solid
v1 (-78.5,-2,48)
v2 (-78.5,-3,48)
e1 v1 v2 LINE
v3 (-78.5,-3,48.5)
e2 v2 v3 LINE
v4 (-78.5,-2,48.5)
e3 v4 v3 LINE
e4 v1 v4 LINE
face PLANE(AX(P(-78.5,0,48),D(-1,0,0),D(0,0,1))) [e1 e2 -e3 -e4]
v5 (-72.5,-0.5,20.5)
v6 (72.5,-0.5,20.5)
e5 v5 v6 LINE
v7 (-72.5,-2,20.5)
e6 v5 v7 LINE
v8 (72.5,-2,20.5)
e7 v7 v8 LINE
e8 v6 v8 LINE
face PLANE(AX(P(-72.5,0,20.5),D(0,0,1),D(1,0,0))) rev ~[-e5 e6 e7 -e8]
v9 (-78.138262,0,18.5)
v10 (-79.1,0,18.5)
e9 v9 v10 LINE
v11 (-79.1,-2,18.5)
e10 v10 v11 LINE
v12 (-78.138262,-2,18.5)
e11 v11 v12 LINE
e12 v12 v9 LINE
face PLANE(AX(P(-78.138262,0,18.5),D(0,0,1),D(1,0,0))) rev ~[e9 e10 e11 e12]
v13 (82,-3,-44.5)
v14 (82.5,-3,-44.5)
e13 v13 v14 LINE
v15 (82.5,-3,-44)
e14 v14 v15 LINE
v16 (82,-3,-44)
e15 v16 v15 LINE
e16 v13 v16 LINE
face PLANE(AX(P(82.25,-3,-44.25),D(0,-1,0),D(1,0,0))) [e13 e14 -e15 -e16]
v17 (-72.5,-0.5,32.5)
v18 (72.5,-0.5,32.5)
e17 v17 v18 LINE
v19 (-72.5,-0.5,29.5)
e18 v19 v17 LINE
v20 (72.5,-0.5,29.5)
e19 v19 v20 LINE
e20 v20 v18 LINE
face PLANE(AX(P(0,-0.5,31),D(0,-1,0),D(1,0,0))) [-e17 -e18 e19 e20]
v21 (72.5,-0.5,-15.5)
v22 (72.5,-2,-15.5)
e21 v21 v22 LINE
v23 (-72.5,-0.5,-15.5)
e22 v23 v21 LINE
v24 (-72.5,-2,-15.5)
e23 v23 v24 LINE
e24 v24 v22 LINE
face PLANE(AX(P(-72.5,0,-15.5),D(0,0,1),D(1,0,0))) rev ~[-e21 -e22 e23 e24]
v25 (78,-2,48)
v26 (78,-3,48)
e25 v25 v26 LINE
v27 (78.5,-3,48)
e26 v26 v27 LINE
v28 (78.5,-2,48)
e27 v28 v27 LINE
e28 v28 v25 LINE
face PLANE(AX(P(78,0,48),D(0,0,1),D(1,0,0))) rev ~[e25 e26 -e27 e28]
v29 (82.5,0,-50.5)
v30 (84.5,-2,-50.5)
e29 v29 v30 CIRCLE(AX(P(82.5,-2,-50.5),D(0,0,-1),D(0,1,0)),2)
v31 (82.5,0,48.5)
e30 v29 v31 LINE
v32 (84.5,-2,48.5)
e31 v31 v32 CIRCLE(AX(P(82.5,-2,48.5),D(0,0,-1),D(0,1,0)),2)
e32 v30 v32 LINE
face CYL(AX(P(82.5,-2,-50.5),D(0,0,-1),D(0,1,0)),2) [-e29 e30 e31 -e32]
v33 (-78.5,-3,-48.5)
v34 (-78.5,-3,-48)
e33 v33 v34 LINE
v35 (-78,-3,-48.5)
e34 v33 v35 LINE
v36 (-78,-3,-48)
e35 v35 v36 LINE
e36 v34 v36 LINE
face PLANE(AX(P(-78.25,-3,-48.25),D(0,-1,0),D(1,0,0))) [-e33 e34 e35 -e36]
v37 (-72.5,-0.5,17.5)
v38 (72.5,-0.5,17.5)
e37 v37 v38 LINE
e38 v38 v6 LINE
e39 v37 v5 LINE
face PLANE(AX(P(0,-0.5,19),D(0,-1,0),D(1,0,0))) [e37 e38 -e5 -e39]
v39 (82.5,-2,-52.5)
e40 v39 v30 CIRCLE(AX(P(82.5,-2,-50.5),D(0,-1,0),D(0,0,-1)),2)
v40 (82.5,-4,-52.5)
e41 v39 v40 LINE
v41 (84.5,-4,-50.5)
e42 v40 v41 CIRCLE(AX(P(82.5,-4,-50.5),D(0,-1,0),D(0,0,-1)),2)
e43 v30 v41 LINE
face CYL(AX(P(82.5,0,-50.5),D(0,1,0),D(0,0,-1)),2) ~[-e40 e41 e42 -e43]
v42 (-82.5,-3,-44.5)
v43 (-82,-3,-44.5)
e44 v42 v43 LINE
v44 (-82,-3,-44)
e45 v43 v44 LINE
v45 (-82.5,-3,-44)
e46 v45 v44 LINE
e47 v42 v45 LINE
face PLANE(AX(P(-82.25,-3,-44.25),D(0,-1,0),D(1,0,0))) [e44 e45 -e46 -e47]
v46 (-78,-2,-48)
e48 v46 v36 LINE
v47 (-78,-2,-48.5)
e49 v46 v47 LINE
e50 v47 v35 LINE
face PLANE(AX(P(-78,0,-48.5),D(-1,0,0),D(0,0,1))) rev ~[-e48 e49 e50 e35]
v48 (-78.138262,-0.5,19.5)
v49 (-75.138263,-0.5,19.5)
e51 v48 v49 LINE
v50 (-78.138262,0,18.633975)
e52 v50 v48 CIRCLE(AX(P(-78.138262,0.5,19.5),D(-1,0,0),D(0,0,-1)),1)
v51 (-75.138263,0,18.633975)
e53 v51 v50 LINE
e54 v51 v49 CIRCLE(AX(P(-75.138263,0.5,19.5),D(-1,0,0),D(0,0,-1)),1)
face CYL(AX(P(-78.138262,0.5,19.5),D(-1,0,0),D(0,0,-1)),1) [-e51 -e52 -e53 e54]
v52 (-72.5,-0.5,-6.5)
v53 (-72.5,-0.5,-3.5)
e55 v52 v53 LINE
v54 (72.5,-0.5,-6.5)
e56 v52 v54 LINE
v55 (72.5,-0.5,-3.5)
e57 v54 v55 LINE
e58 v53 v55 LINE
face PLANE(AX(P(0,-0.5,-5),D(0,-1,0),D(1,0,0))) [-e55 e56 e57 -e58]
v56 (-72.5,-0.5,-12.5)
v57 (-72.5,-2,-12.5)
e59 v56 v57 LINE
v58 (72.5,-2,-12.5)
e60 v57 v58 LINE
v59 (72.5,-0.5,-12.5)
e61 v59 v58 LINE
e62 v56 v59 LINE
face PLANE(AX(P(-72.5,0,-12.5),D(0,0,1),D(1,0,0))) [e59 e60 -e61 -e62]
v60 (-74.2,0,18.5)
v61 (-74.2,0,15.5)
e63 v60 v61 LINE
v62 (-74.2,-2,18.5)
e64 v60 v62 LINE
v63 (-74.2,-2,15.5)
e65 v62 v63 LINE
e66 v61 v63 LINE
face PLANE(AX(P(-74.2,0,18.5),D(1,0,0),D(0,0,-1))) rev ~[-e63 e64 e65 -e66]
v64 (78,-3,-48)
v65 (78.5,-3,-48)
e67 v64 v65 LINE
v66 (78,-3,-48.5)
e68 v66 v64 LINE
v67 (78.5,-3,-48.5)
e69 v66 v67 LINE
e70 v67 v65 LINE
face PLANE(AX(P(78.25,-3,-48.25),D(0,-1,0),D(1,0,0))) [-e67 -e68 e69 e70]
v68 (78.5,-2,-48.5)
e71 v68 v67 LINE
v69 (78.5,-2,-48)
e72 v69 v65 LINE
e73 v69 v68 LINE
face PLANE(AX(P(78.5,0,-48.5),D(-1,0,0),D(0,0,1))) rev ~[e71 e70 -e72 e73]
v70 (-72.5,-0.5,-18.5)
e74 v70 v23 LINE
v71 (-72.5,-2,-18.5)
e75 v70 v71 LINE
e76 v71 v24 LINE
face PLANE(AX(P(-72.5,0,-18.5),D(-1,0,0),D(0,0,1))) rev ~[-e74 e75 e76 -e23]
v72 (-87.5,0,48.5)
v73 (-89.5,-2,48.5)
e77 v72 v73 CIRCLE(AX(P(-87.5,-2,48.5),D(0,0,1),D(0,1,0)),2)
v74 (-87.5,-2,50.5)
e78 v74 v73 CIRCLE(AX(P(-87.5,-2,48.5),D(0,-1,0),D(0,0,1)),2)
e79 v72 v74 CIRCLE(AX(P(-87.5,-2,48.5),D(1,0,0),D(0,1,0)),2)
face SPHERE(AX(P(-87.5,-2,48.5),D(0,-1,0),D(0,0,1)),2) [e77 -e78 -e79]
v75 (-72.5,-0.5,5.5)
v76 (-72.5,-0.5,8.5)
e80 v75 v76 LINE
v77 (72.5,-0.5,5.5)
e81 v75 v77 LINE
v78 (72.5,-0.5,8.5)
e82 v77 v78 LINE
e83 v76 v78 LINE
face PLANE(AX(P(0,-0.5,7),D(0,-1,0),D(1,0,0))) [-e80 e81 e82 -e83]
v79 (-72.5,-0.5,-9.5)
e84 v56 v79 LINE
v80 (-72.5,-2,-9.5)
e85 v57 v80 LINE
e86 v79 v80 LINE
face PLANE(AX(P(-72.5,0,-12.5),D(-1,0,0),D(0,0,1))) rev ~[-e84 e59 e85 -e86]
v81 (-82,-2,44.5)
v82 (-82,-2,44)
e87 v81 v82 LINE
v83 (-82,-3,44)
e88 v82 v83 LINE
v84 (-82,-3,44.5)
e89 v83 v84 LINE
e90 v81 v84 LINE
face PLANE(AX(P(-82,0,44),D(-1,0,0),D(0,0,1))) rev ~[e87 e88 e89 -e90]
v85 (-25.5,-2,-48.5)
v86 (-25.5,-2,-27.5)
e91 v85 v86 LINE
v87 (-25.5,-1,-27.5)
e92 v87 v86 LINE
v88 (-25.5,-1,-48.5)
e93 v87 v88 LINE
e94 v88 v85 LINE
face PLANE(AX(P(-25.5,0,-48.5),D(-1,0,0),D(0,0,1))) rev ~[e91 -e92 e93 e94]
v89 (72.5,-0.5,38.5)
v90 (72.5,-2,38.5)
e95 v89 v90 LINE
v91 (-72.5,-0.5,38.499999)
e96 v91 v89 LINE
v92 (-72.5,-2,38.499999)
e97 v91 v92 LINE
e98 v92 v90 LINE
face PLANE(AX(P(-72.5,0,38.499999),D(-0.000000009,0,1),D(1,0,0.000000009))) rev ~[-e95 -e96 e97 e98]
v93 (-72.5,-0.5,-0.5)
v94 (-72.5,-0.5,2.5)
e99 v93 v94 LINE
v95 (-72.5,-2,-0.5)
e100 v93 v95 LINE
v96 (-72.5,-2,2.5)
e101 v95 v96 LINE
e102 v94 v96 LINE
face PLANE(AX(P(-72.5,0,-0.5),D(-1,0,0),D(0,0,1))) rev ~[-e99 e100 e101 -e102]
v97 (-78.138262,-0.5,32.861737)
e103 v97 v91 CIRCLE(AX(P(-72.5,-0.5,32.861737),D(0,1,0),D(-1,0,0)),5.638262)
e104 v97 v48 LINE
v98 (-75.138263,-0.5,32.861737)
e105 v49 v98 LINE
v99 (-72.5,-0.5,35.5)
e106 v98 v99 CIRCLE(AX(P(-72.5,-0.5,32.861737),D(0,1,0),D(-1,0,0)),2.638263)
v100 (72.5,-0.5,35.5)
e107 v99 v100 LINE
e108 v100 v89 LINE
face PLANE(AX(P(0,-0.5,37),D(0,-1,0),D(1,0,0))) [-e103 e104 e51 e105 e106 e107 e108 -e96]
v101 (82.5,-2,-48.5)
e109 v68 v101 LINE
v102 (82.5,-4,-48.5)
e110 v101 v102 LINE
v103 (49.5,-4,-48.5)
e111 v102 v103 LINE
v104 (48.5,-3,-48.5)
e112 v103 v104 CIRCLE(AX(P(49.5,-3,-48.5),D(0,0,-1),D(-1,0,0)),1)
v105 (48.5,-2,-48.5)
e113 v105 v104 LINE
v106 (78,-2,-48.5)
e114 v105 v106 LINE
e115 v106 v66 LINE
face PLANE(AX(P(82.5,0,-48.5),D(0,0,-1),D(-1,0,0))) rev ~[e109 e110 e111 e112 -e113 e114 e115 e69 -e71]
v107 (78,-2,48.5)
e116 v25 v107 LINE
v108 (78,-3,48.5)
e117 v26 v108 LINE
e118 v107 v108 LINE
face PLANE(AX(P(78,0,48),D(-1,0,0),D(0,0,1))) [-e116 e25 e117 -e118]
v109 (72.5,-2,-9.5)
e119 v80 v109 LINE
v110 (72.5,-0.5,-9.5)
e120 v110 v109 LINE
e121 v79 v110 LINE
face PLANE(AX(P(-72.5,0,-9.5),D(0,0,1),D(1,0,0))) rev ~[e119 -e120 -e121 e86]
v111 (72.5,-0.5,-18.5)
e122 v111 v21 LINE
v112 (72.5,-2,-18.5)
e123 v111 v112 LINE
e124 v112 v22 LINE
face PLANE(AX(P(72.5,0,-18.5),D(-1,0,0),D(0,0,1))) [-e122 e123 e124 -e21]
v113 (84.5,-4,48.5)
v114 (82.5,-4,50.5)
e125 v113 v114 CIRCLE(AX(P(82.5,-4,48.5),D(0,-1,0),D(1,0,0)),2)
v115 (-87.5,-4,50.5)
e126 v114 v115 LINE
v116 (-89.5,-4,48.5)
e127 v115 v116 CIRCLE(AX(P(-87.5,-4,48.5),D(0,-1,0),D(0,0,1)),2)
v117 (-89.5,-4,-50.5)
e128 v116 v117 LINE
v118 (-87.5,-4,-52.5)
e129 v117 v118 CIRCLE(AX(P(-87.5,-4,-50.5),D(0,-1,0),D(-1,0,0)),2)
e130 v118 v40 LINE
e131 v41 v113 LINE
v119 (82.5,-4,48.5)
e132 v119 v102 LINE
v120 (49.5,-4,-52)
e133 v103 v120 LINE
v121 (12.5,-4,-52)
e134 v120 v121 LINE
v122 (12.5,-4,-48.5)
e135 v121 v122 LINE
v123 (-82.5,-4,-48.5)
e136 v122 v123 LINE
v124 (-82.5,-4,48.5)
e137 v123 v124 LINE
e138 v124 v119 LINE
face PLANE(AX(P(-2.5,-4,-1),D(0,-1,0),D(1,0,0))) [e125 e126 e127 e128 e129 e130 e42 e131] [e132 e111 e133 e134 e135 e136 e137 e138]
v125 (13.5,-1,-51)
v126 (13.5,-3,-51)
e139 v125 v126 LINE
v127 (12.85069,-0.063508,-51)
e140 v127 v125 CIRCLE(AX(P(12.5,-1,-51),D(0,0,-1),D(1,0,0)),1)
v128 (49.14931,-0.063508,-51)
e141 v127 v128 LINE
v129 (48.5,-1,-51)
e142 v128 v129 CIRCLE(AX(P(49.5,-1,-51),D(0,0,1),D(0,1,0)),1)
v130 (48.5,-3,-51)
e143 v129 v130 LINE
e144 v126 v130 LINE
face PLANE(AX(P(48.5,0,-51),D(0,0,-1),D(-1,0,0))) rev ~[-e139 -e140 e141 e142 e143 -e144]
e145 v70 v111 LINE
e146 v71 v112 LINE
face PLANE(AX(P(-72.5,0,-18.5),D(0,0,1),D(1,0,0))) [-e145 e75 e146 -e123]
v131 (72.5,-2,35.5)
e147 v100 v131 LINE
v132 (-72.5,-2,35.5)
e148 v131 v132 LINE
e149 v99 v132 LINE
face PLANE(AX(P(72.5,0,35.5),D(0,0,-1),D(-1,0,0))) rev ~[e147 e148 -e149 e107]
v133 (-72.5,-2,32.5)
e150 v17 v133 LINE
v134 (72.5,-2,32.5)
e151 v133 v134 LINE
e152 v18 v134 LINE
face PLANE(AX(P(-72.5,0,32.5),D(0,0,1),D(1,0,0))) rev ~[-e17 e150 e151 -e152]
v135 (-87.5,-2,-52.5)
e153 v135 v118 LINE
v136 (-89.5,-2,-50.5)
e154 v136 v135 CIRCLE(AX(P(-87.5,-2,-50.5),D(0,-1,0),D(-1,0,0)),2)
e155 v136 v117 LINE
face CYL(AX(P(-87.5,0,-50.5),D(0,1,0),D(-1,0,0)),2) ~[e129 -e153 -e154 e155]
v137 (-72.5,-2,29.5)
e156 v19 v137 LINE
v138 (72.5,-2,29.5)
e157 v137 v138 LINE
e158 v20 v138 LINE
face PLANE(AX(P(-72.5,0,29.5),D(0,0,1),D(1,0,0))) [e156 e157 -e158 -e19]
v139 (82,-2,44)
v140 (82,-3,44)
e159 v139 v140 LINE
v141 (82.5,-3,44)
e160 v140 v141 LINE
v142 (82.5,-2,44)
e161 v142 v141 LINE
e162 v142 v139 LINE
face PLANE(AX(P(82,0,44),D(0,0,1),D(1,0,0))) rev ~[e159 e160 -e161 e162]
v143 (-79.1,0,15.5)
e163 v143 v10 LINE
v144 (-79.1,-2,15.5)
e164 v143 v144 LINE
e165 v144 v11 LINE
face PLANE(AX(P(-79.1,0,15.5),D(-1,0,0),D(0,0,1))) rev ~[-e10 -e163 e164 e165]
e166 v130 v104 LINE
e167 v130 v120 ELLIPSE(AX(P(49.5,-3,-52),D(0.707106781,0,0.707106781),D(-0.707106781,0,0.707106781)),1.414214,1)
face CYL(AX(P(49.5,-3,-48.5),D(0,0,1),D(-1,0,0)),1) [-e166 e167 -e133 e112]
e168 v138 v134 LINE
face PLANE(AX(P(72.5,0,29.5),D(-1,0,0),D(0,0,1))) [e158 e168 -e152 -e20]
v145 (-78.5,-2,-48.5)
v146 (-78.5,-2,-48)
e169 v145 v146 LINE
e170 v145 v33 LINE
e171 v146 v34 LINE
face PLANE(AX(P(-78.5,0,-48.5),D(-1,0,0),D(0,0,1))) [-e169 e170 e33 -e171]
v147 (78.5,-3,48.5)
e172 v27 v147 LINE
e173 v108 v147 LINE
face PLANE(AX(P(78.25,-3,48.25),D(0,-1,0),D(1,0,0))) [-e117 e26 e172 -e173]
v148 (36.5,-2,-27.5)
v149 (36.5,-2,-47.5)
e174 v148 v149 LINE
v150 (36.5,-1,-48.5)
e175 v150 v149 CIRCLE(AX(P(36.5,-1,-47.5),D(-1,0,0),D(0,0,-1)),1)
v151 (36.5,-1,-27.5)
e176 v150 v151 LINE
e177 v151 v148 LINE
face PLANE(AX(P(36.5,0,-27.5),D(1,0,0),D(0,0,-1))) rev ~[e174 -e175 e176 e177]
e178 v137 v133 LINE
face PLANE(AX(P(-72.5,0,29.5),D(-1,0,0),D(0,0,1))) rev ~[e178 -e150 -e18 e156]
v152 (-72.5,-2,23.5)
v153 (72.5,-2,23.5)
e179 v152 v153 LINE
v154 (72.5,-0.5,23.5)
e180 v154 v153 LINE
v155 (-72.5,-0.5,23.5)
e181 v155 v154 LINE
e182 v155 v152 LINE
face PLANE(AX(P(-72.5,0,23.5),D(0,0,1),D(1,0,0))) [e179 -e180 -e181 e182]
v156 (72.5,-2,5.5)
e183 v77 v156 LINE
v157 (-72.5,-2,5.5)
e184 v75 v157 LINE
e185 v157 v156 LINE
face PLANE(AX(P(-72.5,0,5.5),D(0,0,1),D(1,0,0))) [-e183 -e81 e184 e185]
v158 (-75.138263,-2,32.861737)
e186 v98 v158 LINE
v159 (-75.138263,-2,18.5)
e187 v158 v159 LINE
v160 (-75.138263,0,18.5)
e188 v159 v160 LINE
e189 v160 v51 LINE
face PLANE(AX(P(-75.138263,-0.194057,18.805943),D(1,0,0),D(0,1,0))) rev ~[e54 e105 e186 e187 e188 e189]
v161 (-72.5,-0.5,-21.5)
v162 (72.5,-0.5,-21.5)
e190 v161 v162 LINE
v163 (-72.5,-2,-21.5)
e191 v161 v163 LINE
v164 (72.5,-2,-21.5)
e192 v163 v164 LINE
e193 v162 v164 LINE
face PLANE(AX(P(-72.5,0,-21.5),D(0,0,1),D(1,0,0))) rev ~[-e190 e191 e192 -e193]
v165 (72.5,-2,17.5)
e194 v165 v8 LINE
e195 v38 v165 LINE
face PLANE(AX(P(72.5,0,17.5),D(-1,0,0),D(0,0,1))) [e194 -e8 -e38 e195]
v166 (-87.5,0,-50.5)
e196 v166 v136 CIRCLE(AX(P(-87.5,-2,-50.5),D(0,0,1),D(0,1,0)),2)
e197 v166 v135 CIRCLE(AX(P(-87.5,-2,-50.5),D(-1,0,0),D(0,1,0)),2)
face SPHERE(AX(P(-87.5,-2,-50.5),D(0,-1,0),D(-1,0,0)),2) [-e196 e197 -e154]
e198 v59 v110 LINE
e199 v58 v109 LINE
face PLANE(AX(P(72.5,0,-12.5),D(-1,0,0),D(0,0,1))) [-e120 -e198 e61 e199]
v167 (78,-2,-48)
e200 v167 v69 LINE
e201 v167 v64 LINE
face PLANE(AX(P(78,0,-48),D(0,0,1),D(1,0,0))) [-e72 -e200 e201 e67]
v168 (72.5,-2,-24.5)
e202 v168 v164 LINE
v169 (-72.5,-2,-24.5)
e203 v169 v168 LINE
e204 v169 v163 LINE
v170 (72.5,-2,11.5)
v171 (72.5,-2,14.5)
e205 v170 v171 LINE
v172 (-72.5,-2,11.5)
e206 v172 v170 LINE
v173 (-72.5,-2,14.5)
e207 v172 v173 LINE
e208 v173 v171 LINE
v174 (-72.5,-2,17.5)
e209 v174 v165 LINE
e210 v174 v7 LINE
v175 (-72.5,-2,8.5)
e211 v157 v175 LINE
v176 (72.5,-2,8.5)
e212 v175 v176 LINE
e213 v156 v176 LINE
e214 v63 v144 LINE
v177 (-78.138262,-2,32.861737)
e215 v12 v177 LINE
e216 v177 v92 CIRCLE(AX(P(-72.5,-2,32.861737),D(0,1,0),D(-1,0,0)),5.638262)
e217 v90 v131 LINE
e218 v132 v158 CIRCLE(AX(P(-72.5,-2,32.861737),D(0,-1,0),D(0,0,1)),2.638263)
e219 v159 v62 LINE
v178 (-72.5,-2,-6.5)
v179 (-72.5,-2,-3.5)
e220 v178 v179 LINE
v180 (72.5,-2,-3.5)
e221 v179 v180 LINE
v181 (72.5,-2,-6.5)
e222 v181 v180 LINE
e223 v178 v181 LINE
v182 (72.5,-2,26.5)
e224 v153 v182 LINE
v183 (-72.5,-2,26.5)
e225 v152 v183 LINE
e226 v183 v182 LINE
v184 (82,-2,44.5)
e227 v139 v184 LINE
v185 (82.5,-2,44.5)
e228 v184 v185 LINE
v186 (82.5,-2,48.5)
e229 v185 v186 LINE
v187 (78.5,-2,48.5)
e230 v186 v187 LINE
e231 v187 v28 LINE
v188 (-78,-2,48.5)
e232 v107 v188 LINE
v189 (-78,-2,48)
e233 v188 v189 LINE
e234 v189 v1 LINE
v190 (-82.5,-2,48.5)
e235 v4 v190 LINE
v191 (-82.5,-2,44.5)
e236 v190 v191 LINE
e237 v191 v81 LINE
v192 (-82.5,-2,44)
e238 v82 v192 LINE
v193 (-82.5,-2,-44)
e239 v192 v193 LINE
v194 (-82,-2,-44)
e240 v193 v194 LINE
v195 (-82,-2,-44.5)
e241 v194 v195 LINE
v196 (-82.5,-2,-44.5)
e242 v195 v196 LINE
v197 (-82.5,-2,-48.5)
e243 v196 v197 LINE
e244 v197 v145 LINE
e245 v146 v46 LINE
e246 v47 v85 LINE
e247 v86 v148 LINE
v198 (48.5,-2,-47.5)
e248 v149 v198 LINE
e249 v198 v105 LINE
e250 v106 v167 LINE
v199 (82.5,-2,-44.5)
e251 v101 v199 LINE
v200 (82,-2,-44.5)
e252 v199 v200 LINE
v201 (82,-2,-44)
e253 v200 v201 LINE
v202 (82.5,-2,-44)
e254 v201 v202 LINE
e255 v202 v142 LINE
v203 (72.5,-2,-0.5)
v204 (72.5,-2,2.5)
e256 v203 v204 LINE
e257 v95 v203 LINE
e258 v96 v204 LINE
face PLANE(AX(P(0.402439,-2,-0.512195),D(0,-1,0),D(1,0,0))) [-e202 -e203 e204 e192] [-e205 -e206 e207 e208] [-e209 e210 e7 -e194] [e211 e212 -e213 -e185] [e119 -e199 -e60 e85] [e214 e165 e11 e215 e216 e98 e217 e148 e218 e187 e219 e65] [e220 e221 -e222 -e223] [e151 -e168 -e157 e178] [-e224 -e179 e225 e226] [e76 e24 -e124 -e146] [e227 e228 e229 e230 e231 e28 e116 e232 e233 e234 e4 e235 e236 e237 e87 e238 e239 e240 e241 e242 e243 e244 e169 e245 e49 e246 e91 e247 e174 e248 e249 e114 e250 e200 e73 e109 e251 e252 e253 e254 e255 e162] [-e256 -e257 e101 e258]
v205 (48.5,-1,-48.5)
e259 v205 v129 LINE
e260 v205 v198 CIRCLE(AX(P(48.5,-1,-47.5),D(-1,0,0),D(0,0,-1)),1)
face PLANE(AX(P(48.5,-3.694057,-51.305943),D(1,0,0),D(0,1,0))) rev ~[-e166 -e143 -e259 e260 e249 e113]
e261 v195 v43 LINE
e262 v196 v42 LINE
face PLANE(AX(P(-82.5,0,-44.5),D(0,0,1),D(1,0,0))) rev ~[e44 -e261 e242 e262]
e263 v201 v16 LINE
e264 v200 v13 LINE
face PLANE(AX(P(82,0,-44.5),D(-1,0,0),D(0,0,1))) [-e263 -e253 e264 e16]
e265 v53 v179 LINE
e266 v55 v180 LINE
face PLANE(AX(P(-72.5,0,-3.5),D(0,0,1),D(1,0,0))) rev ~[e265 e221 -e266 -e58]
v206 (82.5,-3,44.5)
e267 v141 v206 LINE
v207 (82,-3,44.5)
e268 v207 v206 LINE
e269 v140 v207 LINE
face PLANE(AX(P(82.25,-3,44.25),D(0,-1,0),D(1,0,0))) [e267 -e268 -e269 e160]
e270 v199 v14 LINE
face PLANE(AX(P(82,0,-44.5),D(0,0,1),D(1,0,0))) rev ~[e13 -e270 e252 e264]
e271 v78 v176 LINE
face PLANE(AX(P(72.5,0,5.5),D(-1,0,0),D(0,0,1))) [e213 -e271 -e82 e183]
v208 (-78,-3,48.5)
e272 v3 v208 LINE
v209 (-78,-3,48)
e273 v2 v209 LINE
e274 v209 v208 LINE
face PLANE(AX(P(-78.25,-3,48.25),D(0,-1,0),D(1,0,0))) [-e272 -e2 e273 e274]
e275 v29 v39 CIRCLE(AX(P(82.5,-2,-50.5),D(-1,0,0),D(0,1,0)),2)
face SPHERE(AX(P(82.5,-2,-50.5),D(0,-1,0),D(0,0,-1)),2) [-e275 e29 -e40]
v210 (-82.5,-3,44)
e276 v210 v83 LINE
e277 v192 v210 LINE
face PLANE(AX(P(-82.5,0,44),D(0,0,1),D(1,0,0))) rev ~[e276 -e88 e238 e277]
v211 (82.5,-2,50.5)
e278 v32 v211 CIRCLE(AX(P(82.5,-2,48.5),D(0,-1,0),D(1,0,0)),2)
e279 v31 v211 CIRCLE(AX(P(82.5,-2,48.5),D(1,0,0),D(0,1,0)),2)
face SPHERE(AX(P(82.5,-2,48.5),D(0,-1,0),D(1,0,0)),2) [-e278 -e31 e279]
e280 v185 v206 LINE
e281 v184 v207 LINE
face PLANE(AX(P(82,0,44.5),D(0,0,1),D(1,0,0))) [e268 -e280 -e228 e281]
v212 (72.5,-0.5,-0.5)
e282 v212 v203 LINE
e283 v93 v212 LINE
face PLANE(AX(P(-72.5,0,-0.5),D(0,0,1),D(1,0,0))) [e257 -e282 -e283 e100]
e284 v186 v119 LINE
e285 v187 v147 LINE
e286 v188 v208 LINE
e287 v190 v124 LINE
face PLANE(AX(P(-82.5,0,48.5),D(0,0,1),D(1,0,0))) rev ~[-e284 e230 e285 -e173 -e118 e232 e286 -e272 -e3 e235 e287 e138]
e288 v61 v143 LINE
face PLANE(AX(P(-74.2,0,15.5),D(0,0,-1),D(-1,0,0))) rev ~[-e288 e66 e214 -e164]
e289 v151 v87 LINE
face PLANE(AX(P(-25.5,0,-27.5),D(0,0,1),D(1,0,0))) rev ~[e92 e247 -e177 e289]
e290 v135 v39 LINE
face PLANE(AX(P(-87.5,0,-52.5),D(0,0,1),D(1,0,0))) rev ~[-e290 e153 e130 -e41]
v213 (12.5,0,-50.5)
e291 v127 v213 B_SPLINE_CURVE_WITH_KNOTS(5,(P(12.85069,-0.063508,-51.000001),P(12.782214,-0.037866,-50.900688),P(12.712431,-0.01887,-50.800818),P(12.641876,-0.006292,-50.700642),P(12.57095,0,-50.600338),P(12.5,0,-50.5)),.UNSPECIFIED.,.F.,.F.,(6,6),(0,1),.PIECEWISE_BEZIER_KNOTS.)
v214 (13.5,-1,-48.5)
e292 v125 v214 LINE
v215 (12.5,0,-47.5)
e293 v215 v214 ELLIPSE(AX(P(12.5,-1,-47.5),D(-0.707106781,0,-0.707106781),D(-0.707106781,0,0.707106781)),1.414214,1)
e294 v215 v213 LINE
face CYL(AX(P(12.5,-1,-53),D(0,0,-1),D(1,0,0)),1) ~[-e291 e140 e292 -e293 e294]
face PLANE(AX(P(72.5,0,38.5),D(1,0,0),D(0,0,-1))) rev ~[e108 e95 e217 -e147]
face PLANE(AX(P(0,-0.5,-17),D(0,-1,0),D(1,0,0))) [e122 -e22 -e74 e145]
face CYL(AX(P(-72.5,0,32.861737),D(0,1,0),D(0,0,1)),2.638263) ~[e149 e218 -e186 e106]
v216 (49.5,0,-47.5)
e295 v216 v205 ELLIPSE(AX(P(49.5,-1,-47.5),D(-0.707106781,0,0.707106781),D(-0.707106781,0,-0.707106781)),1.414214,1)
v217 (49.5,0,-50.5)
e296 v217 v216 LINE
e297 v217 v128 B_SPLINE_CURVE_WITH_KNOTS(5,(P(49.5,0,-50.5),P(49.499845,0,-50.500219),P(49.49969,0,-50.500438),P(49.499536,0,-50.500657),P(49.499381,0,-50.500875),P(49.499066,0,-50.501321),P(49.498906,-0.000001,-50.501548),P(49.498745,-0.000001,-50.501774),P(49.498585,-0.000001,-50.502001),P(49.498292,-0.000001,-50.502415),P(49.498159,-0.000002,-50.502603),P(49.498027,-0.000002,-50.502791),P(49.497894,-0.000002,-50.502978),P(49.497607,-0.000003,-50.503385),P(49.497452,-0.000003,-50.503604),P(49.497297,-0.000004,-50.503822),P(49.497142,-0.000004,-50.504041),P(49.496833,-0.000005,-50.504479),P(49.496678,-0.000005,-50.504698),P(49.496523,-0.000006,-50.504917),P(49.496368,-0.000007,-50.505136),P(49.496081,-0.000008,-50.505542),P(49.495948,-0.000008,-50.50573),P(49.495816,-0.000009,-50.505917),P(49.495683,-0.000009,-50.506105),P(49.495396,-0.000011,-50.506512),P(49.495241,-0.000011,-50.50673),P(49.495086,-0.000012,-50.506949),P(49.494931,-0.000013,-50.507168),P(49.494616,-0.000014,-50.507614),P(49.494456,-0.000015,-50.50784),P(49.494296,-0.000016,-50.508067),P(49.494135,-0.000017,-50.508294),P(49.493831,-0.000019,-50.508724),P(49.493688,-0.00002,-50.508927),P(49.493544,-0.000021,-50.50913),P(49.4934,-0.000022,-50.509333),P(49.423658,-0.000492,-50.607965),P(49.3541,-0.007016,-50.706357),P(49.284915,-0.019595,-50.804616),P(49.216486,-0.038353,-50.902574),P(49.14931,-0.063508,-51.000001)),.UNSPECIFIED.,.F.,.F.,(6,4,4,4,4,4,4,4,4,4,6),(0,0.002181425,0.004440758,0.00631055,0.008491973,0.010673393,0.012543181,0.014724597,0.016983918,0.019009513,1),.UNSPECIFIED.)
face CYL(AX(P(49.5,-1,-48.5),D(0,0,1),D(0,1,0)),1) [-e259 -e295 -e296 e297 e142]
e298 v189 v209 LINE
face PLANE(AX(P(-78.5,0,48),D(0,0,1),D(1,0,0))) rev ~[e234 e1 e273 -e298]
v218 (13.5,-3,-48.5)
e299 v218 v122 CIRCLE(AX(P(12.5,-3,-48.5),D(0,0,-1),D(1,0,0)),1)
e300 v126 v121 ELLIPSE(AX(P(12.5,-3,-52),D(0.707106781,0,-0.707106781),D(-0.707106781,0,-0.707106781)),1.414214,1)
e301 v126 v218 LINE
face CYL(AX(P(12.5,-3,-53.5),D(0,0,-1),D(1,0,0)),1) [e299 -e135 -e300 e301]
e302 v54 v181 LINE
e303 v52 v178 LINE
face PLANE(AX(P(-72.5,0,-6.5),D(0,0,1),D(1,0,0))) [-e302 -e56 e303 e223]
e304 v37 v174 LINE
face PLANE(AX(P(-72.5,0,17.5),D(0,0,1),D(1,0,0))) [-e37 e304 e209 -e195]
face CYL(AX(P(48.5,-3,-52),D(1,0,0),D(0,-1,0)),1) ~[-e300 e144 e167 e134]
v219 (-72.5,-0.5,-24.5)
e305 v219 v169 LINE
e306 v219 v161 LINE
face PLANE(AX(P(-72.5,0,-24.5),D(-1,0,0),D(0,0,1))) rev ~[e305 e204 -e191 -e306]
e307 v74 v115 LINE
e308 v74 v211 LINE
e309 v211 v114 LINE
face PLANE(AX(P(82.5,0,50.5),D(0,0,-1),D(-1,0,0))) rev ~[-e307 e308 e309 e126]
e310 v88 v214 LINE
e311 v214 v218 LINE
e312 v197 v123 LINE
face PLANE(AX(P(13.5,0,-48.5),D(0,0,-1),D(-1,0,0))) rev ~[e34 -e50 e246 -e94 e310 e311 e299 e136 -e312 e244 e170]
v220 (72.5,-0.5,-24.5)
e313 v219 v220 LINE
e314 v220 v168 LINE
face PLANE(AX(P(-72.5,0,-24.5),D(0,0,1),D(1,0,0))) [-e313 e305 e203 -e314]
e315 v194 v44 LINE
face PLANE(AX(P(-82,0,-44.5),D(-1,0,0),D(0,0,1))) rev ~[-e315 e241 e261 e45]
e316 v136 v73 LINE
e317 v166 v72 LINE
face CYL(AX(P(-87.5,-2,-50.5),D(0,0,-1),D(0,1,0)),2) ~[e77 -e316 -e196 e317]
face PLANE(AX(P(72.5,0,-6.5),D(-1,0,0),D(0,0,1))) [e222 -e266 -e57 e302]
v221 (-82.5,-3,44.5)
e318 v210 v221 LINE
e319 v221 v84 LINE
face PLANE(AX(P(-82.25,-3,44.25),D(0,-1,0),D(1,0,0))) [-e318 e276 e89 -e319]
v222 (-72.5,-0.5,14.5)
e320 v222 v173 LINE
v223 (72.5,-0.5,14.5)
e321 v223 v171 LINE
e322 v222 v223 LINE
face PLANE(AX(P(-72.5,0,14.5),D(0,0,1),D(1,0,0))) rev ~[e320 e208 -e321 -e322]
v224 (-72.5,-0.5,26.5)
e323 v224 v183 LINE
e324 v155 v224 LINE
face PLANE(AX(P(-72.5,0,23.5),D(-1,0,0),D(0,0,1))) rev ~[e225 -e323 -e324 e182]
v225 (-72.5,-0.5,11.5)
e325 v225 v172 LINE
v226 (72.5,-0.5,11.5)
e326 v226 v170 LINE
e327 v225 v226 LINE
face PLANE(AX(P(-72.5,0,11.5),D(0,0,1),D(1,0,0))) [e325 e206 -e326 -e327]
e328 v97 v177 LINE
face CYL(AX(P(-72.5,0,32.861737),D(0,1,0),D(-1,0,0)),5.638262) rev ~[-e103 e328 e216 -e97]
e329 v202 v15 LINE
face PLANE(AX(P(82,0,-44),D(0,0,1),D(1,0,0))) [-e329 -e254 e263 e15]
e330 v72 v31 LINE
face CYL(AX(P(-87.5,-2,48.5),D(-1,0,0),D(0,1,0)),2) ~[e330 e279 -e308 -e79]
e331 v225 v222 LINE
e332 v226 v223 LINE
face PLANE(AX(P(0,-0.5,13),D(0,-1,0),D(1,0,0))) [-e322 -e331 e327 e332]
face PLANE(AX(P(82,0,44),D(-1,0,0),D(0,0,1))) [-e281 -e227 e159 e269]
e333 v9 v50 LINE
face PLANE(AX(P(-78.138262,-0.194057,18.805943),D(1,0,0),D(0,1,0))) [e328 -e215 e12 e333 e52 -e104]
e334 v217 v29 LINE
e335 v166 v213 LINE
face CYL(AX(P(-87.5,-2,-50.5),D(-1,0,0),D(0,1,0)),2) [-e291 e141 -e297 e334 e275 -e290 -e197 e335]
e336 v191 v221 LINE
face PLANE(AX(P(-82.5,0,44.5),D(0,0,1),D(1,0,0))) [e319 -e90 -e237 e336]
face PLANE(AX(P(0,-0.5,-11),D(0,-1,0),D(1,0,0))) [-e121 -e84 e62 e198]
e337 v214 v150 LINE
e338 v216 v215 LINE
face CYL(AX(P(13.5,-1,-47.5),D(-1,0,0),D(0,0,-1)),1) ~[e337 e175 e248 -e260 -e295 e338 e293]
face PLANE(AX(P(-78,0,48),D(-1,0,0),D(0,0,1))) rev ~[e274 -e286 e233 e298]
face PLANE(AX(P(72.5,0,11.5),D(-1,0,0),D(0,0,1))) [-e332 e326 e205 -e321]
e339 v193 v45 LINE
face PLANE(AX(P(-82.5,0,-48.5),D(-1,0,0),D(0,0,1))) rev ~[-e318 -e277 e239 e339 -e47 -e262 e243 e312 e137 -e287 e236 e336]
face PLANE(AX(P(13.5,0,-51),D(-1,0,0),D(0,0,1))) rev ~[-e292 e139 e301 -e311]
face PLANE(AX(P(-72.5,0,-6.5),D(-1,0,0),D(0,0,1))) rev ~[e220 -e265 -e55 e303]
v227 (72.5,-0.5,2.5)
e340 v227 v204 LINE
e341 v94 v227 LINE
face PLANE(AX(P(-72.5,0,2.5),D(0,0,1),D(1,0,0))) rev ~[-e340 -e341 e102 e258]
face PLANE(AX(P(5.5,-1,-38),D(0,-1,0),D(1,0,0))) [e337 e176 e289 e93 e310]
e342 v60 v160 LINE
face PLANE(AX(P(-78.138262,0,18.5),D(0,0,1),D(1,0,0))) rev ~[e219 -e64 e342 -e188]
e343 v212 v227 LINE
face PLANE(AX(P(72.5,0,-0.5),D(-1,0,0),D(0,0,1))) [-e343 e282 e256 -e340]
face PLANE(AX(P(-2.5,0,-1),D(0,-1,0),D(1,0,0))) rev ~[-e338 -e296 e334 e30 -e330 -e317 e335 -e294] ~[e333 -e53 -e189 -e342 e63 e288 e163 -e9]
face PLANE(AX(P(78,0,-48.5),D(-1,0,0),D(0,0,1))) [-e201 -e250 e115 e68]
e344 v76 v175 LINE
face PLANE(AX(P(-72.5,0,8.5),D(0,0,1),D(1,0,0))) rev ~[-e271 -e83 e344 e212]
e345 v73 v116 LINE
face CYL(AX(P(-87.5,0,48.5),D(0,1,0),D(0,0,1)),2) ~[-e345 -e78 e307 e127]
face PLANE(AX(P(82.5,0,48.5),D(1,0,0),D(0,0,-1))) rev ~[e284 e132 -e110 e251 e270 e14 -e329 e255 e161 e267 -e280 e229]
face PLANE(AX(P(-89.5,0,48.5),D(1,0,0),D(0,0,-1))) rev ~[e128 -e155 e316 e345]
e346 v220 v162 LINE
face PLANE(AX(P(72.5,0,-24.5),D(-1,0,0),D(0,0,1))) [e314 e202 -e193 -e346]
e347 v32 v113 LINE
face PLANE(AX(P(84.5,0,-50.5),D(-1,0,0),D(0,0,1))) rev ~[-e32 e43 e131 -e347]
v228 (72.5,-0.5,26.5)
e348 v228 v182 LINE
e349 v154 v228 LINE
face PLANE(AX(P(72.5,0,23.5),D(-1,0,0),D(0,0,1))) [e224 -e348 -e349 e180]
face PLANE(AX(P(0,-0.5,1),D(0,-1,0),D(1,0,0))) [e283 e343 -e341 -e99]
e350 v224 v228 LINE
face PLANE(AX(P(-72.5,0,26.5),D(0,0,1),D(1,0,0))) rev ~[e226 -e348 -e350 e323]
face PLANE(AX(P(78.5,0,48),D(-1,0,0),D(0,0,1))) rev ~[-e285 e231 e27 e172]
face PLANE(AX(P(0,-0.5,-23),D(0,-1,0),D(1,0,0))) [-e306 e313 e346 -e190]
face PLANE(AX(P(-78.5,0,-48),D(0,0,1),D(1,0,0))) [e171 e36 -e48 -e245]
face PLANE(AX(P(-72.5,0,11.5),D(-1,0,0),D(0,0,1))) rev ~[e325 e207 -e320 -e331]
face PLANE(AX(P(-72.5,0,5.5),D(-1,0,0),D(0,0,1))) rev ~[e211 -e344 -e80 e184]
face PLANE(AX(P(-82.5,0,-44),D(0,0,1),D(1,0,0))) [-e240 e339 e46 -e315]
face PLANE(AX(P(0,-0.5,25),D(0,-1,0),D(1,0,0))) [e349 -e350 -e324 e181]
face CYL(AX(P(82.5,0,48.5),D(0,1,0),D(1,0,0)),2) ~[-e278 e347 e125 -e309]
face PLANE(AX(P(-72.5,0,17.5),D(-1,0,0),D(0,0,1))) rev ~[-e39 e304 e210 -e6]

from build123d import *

# Parameters (mm, degrees)
F1_DEPTH     = 1
F0_W         = 145
F0_H         = 3
F2_DEPTH     = 2
F3_DEPTH     = 0.5
F0_W_2       = 0.5
F0_H_2       = 0.5
F4_DEPTH     = 3
F5_DEPTH     = 4
F6_T1_DEPTH  = 99
F6_T3_DEPTH  = 170
F6_T6_ANGLE  = 90
F6_T8_ANGLE  = 90
F6_T10_ANGLE = 90
F6_T12_ANGLE = 90
F7_T1_DEPTH  = 35
F7_T3_DEPTH  = 5
F7_T5_DEPTH  = 14.5
F7_T7_DEPTH  = 2.9999986291
F7_T12_DEPTH = 4.5
F7_T17_DEPTH = 4.5
F7_T23_DEPTH = 5
F7_T28_DEPTH = 37.5
F7_T35_DEPTH = 5
F7_T40_DEPTH = 37.5
F7_T47_DEPTH = 37.5
F7_T51_DEPTH = 7
F7_T58_DEPTH = 37.5
F7_T62_DEPTH = 7


# Not quite as in the source:
# - a fillet or chamfer that OpenCascade refuses, or shapes differently, is made with other operations: its cross-section is extruded or revolved along the edge and cut away or added
# - two fillets or chamfers of one size are made in one step
# - ends of sketch curves that miss each other by under 0.0002 mm in the source are joined
# - a feature names something its author has since deleted; it is built from what else it names


with BuildPart() as f1:
    # F0 (on Front) → F1 (new body)
    with BuildSketch(Plane.XZ):
        Polygon((-25.5, -27.5), (-25.5, -48.5), (13.5, -48.5), (36.5, -48.5), (36.5, -27.5), align=None)
    extrude(amount=F1_DEPTH)

    # F0 (on Front) → F2 (join)
    with BuildSketch(Plane.XZ):
        Polygon((-78.5, 48.5), (-82.5, 48.5), (-82.5, 44.5), (-82, 44.5), (-82, 44), (-82.5, 44), (-82.5, -44), (-82, -44), (-82, -44.5), (-82.5, -44.5), (-82.5, -48.5), (-78.5, -48.5), (-78.5, -48), (-78, -48), (-78, -48.5), (-25.5, -48.5), (-25.5, -27.5), (36.5, -27.5), (36.5, -48.5), (48.5, -48.5), (78, -48.5), (78, -48), (78.5, -48), (78.5, -48.5), (82.5, -48.5), (82.5, -44.5), (82, -44.5), (82, -44), (82.5, -44), (82.5, 44), (82, 44), (82, 44.5), (82.5, 44.5), (82.5, 48.5), (78.5, 48.5), (78.5, 48), (78, 48), (78, 48.5), (-78, 48.5), (-78, 48), (-78.5, 48), align=None)
        with Locations((0, -23)):
            Rectangle(F0_W, F0_H, mode=Mode.SUBTRACT)
        with Locations((0, -17)):
            Rectangle(F0_W, F0_H, mode=Mode.SUBTRACT)
        with Locations((0, -11)):
            Rectangle(F0_W, F0_H, mode=Mode.SUBTRACT)
        with Locations((0, -5)):
            Rectangle(F0_W, F0_H, mode=Mode.SUBTRACT)
        with BuildLine():
            ThreePointArc((-78.1382620335, 32.8617365956), (-76.486853318, 36.8485899136), (-72.5, 38.4999986291))
            Line((-72.5, 38.4999986291), (72.5, 38.5))
            Line((72.5, 38.5), (72.5, 35.5))
            Line((72.5, 35.5), (-72.5, 35.5))
            ThreePointArc((-72.5, 35.5), (-74.3655339438, 34.7272705394), (-75.1382634044, 32.8617365956))
            Line((-75.1382634044, 32.8617365956), (-75.1382634044, 18.5))
            Line((-75.1382634044, 18.5), (-74.2, 18.5))
            Line((-74.2, 18.5), (-74.2, 15.5))
            Line((-74.2, 15.5), (-79.1, 15.5))
            Line((-79.1, 15.5), (-79.1, 18.5))
            Line((-79.1, 18.5), (-78.1382620335, 18.5))
            Line((-78.1382620335, 18.5), (-78.1382620335, 32.8617365956))
        make_face(mode=Mode.SUBTRACT)
        with Locations((0, 1)):
            Rectangle(F0_W, F0_H, mode=Mode.SUBTRACT)
        with Locations((0, 7)):
            Rectangle(F0_W, F0_H, mode=Mode.SUBTRACT)
        with Locations((0, 13)):
            Rectangle(F0_W, F0_H, mode=Mode.SUBTRACT)
        with Locations((0, 19)):
            Rectangle(F0_W, F0_H, mode=Mode.SUBTRACT)
        with Locations((0, 25)):
            Rectangle(F0_W, F0_H, mode=Mode.SUBTRACT)
        with Locations((0, 31)):
            Rectangle(F0_W, F0_H, mode=Mode.SUBTRACT)
    extrude(amount=F2_DEPTH)

    # F0 (on Front) → F3 (join)
    with BuildSketch(Plane.XZ):
        with Locations((0, 37)):
            Rectangle(F0_W, F0_H)
        with Locations((0, 31)):
            Rectangle(F0_W, F0_H)
        with Locations((0, 25)):
            Rectangle(F0_W, F0_H)
        with Locations((0, 19)):
            Rectangle(F0_W, F0_H)
        with Locations((0, 13)):
            Rectangle(F0_W, F0_H)
        with Locations((0, 7)):
            Rectangle(F0_W, F0_H)
        with Locations((0, 1)):
            Rectangle(F0_W, F0_H)
        with Locations((0, -5)):
            Rectangle(F0_W, F0_H)
        with Locations((0, -11)):
            Rectangle(F0_W, F0_H)
        with Locations((0, -17)):
            Rectangle(F0_W, F0_H)
        with Locations((0, -23)):
            Rectangle(F0_W, F0_H)
        with BuildLine():
            Line((-72.5, 35.5), (-72.5, 38.5))
            ThreePointArc((-72.5, 38.5), (-76.486853318, 36.8485899136), (-78.1382620335, 32.8617365956))
            Line((-78.1382620335, 32.8617365956), (-78.1382620335, 18.5))
            Line((-78.1382620335, 18.5), (-75.1382634044, 18.5))
            Line((-75.1382634044, 18.5), (-75.1382634044, 32.8617365956))
            ThreePointArc((-75.1382634044, 32.8617365956), (-74.3655339438, 34.7272705394), (-72.5, 35.5))
        make_face()
    extrude(amount=F3_DEPTH)

    # F0 (on Front) → F4 (join)
    with BuildSketch(Plane.XZ):
        with Locations((-82.25, 44.25)):
            Rectangle(F0_W_2, F0_H_2)
        with Locations((-78.25, 48.25)):
            Rectangle(F0_W_2, F0_H_2)
        with Locations((-82.25, -44.25)):
            Rectangle(F0_W_2, F0_H_2)
        with Locations((-78.25, -48.25)):
            Rectangle(F0_W_2, F0_H_2)
        with Locations((82.25, -44.25)):
            Rectangle(F0_W_2, F0_H_2)
        with Locations((78.25, -48.25)):
            Rectangle(F0_W_2, F0_H_2)
        with Locations((78.25, 48.25)):
            Rectangle(F0_W_2, F0_H_2)
        with Locations((82.25, 44.25)):
            Rectangle(F0_W_2, F0_H_2)
    extrude(amount=F4_DEPTH)

    # F0 (on Front) → F5 (join)
    with BuildSketch(Plane.XZ):
        with BuildLine():
            Line((82.5, 50.5), (-87.5, 50.5))
            ThreePointArc((-87.5, 50.5), (-88.9142135624, 49.9142135624), (-89.5, 48.5))
            Line((-89.5, 48.5), (-89.5, -50.5))
            ThreePointArc((-89.5, -50.5), (-88.9142135624, -51.9142135624), (-87.5, -52.5))
            Line((-87.5, -52.5), (82.5, -52.5))
            ThreePointArc((82.5, -52.5), (83.9142135624, -51.9142135624), (84.5, -50.5))
            Line((84.5, -50.5), (84.5, 48.5))
            ThreePointArc((84.5, 48.5), (83.9142135624, 49.9142135624), (82.5, 50.5))
        make_face()
        Polygon((-82.5, 44.5), (-82.5, 48.5), (-78.5, 48.5), (-78, 48.5), (78, 48.5), (78.5, 48.5), (82.5, 48.5), (82.5, 44.5), (82.5, 44), (82.5, -44), (82.5, -44.5), (82.5, -48.5), (78.5, -48.5), (78, -48.5), (48.5, -48.5), (48.5, -51), (13.5, -51), (13.5, -48.5), (-25.5, -48.5), (-78, -48.5), (-78.5, -48.5), (-82.5, -48.5), (-82.5, -44.5), (-82.5, -44), (-82.5, 44), align=None, mode=Mode.SUBTRACT)
    extrude(amount=F5_DEPTH)

    # F6: fillet of radius 2 on 8 edges, made by hand

    # F6_s2 → F6_t1 (cut)
    with BuildSketch(Plane.XY.offset(-50.5)):
        with BuildLine():
            ThreePointArc((82.5, 0), (83.9142135624, -0.5857864376), (84.5, -2))
            Line((84.5, -2), (84.5, 0))
            Line((84.5, 0), (82.5, 0))
        make_face()
        with BuildLine():
            ThreePointArc((-87.5, 0), (-88.9142135624, -0.5857864376), (-89.5, -2))
            Line((-89.5, -2), (-89.5, 0))
            Line((-89.5, 0), (-87.5, 0))
        make_face()
    extrude(amount=F6_T1_DEPTH, mode=Mode.SUBTRACT)

    # F6_s4 → F6_t3 (cut)
    with BuildSketch(Plane.YZ.offset(-87.5)):
        with BuildLine():
            ThreePointArc((0, 48.5), (-0.5857864376, 49.9142135624), (-2, 50.5))
            Line((-2, 50.5), (0, 50.5))
            Line((0, 50.5), (0, 48.5))
        make_face()
        with BuildLine():
            ThreePointArc((0, -50.5), (-0.5857864376, -51.9142135624), (-2, -52.5))
            Line((-2, -52.5), (0, -52.5))
            Line((0, -52.5), (0, -50.5))
        make_face()
    extrude(amount=F6_T3_DEPTH, mode=Mode.SUBTRACT)

    # F6_s5 → F6_t6 (revolve, cut)
    with BuildSketch(Plane.YZ.offset(-87.5)):
        with BuildLine():
            ThreePointArc((0, 48.5), (-0.5857864376, 49.9142135624), (-2, 50.5))
            Line((-2, 50.5), (0, 50.5))
            Line((0, 50.5), (0, 48.5))
        make_face()
    revolve(axis=Axis((-87.5, 0, 48.5), (0, -1, 0)), revolution_arc=F6_T6_ANGLE, mode=Mode.SUBTRACT)

    # F6_s7 → F6_t8 (revolve, cut)
    with BuildSketch(Plane.XY.offset(-50.5)):
        with BuildLine():
            ThreePointArc((-87.5, 0), (-88.9142135624, -0.5857864376), (-89.5, -2))
            Line((-89.5, -2), (-89.5, 0))
            Line((-89.5, 0), (-87.5, 0))
        make_face()
    revolve(axis=Axis((-87.5, 0, -50.5), (0, -1, 0)), revolution_arc=F6_T8_ANGLE, mode=Mode.SUBTRACT)

    # F6_s9 → F6_t10 (revolve, cut)
    with BuildSketch(Plane.YZ.offset(82.5)):
        with BuildLine():
            ThreePointArc((0, -50.5), (-0.5857864376, -51.9142135624), (-2, -52.5))
            Line((-2, -52.5), (0, -52.5))
            Line((0, -52.5), (0, -50.5))
        make_face()
    revolve(axis=Axis((82.5, 0, -50.5), (0, -1, 0)), revolution_arc=F6_T10_ANGLE, mode=Mode.SUBTRACT)

    # F6_s11 → F6_t12 (revolve, cut)
    with BuildSketch(Plane.XY.offset(48.5)):
        with BuildLine():
            ThreePointArc((82.5, 0), (83.9142135624, -0.5857864376), (84.5, -2))
            Line((84.5, -2), (84.5, 0))
            Line((84.5, 0), (82.5, 0))
        make_face()
    revolve(axis=Axis((82.5, 0, 48.5), (0, -1, 0)), revolution_arc=F6_T12_ANGLE, mode=Mode.SUBTRACT)

    # F7: fillet of radius 1 on 8 edges, made by hand

    # F7_s2 → F7_t1 (cut)
    with BuildSketch(Plane.YZ.offset(13.5)):
        with BuildLine():
            ThreePointArc((-4, -52), (-3.7071067812, -51.2928932188), (-3, -51))
            Line((-3, -51), (-4, -51))
            Line((-4, -51), (-4, -52))
        make_face()
        with BuildLine():
            ThreePointArc((-1, -48.5), (-0.2928932188, -48.2071067812), (0, -47.5))
            Line((0, -47.5), (0, -48.5))
            Line((0, -48.5), (-1, -48.5))
        make_face()
    extrude(amount=F7_T1_DEPTH, mode=Mode.SUBTRACT)

    # F7_s4 → F7_t3 (cut)
    with BuildSketch(Plane.XY.offset(-51)):
        with BuildLine():
            ThreePointArc((48.5, -3), (48.7928932188, -3.7071067812), (49.5, -4))
            Line((49.5, -4), (48.5, -4))
            Line((48.5, -4), (48.5, -3))
        make_face()
        with BuildLine():
            ThreePointArc((13.5, -3), (13.2071067812, -3.7071067812), (12.5, -4))
            Line((12.5, -4), (13.5, -4))
            Line((13.5, -4), (13.5, -3))
        make_face()
    extrude(amount=F7_T3_DEPTH, mode=Mode.SUBTRACT)

    # F7_s6 → F7_t5 (cut)
    with BuildSketch(Plane.YZ.offset(34)):
        with BuildLine():
            ThreePointArc((-1, -48.5), (-1.7071067812, -48.2071067812), (-2, -47.5))
            Line((-2, -47.5), (-2, -48.5))
            Line((-2, -48.5), (-1, -48.5))
        make_face()
    extrude(amount=F7_T5_DEPTH, mode=Mode.SUBTRACT)

    # F7_s8 → F7_t7 (cut)
    with BuildSketch(Plane.YZ.offset(-78.1382620335)):
        with BuildLine():
            ThreePointArc((0.5, 18.5), (-0.2071067812, 18.7928932188), (-0.5, 19.5))
            Line((-0.5, 19.5), (-0.5, 18.5))
            Line((-0.5, 18.5), (0.5, 18.5))
        make_face()
    extrude(amount=F7_T7_DEPTH, mode=Mode.SUBTRACT)


with BuildPart() as f7_tool10:
    # F7_s11 → F7_t12 (new body)
    with BuildSketch(Plane.XY.offset(-53)):
        with BuildLine():
            ThreePointArc((13.5, -1), (13.2071067812, -0.2928932188), (12.5, 0))
            Line((12.5, 0), (13.5, 0))
            Line((13.5, 0), (13.5, -1))
        make_face()
    extrude(amount=F7_T12_DEPTH)

    split(bisect_by=Plane.XY.offset(-51), keep=Keep.TOP)


with BuildPart() as f1_1:
    add(f1.part)

    # F7_t9: cut F7_tool10
    add(f7_tool10.part, mode=Mode.SUBTRACT)


with BuildPart() as f7_tool15:
    # F7_s16 → F7_t17 (new body)
    with BuildSketch(Plane.XY.offset(-48.5)):
        with BuildLine():
            ThreePointArc((49.5, 0), (48.7928932188, -0.2928932188), (48.5, -1))
            Line((48.5, -1), (48.5, 0))
            Line((48.5, 0), (49.5, 0))
        make_face()
    extrude(amount=-F7_T17_DEPTH)

    split(bisect_by=Plane.XY.offset(-51), keep=Keep.TOP)


with BuildPart() as f1_2:
    add(f1_1.part)

    # F7_t14: cut F7_tool15
    add(f7_tool15.part, mode=Mode.SUBTRACT)


with BuildPart() as f7_tool21:
    # F7_s22 → F7_t23 (new body)
    with BuildSketch(Plane.XY.offset(-48.5)):
        with BuildLine():
            ThreePointArc((48.5, -3), (48.7928932188, -3.7071067812), (49.5, -4))
            Line((49.5, -4), (48.5, -4))
            Line((48.5, -4), (48.5, -3))
        make_face()
    extrude(amount=-F7_T23_DEPTH)

    split(bisect_by=Plane.XY.offset(-51), keep=Keep.BOTTOM)

    split(bisect_by=Plane.XY.offset(-52.5), keep=Keep.TOP)


with BuildPart() as f7_tool26:
    # F7_s27 → F7_t28 (new body)
    with BuildSketch(Plane.YZ.offset(51)):
        with BuildLine():
            ThreePointArc((-4, -52), (-3.7071067812, -51.2928932188), (-3, -51))
            Line((-3, -51), (-4, -51))
            Line((-4, -51), (-4, -52))
        make_face()
    extrude(amount=-F7_T28_DEPTH)

    split(bisect_by=Plane.YZ.offset(48.5), keep=Keep.TOP)


with BuildPart() as f7_tool21_1:
    add(f7_tool21.part)

    # F7_t30: intersect F7_tool26
    add(f7_tool26.part, mode=Mode.INTERSECT)


with BuildPart() as f1_3:
    add(f1_2.part)

    # F7_t19: cut F7_tool21
    add(f7_tool21_1.part, mode=Mode.SUBTRACT)


with BuildPart() as f7_tool33:
    # F7_s34 → F7_t35 (new body)
    with BuildSketch(Plane.XY.offset(-53.5)):
        with BuildLine():
            ThreePointArc((13.5, -3), (13.2071067812, -3.7071067812), (12.5, -4))
            Line((12.5, -4), (13.5, -4))
            Line((13.5, -4), (13.5, -3))
        make_face()
    extrude(amount=F7_T35_DEPTH)

    split(bisect_by=Plane.XY.offset(-51), keep=Keep.BOTTOM)

    split(bisect_by=Plane.XY.offset(-52.5), keep=Keep.TOP)


with BuildPart() as f7_tool38:
    # F7_s39 → F7_t40 (new body)
    with BuildSketch(Plane.YZ.offset(48.5)):
        with BuildLine():
            ThreePointArc((-4, -52), (-3.7071067812, -51.2928932188), (-3, -51))
            Line((-3, -51), (-4, -51))
            Line((-4, -51), (-4, -52))
        make_face()
    extrude(amount=-F7_T40_DEPTH)

    split(bisect_by=Plane.YZ.offset(13.5), keep=Keep.BOTTOM)


with BuildPart() as f7_tool33_1:
    add(f7_tool33.part)

    # F7_t42: intersect F7_tool38
    add(f7_tool38.part, mode=Mode.INTERSECT)


with BuildPart() as f1_4:
    add(f1_3.part)

    # F7_t31: cut F7_tool33
    add(f7_tool33_1.part, mode=Mode.SUBTRACT)


with BuildPart() as f7_tool45:
    # F7_s46 → F7_t47 (new body)
    with BuildSketch(Plane.YZ.offset(11)):
        with BuildLine():
            ThreePointArc((-1, -48.5), (-0.2928932188, -48.2071067812), (0, -47.5))
            Line((0, -47.5), (0, -48.5))
            Line((0, -48.5), (-1, -48.5))
        make_face()
    extrude(amount=F7_T47_DEPTH)

    split(bisect_by=Plane.YZ.offset(13.5), keep=Keep.BOTTOM)


with BuildPart() as f7_tool49:
    # F7_s50 → F7_t51 (new body)
    with BuildSketch(Plane.XY.offset(-53)):
        with BuildLine():
            ThreePointArc((13.5, -1), (13.2071067812, -0.2928932188), (12.5, 0))
            Line((12.5, 0), (13.5, 0))
            Line((13.5, 0), (13.5, -1))
        make_face()
    extrude(amount=F7_T51_DEPTH)

    split(bisect_by=Plane.XY.offset(-48.5), keep=Keep.TOP)


with BuildPart() as f7_tool45_1:
    add(f7_tool45.part)

    # F7_t53: intersect F7_tool49
    add(f7_tool49.part, mode=Mode.INTERSECT)


with BuildPart() as f1_5:
    add(f1_4.part)

    # F7_t43: cut F7_tool45
    add(f7_tool45_1.part, mode=Mode.SUBTRACT)


with BuildPart() as f7_tool56:
    # F7_s57 → F7_t58 (new body)
    with BuildSketch(Plane.YZ.offset(13.5)):
        with BuildLine():
            ThreePointArc((-1, -48.5), (-0.2928932188, -48.2071067812), (0, -47.5))
            Line((0, -47.5), (0, -48.5))
            Line((0, -48.5), (-1, -48.5))
        make_face()
    extrude(amount=F7_T58_DEPTH)

    split(bisect_by=Plane.YZ.offset(48.5), keep=Keep.TOP)


with BuildPart() as f7_tool60:
    # F7_s61 → F7_t62 (new body)
    with BuildSketch(Plane.XY.offset(-46)):
        with BuildLine():
            ThreePointArc((49.5, 0), (48.7928932188, -0.2928932188), (48.5, -1))
            Line((48.5, -1), (48.5, 0))
            Line((48.5, 0), (49.5, 0))
        make_face()
    extrude(amount=-F7_T62_DEPTH)

    split(bisect_by=Plane.XY.offset(-48.5), keep=Keep.TOP)


with BuildPart() as f7_tool56_1:
    add(f7_tool56.part)

    # F7_t64: intersect F7_tool60
    add(f7_tool60.part, mode=Mode.INTERSECT)


with BuildPart() as f1_6:
    add(f1_5.part)

    # F7_t54: cut F7_tool56
    add(f7_tool56_1.part, mode=Mode.SUBTRACT)


solid = f1_6.part
